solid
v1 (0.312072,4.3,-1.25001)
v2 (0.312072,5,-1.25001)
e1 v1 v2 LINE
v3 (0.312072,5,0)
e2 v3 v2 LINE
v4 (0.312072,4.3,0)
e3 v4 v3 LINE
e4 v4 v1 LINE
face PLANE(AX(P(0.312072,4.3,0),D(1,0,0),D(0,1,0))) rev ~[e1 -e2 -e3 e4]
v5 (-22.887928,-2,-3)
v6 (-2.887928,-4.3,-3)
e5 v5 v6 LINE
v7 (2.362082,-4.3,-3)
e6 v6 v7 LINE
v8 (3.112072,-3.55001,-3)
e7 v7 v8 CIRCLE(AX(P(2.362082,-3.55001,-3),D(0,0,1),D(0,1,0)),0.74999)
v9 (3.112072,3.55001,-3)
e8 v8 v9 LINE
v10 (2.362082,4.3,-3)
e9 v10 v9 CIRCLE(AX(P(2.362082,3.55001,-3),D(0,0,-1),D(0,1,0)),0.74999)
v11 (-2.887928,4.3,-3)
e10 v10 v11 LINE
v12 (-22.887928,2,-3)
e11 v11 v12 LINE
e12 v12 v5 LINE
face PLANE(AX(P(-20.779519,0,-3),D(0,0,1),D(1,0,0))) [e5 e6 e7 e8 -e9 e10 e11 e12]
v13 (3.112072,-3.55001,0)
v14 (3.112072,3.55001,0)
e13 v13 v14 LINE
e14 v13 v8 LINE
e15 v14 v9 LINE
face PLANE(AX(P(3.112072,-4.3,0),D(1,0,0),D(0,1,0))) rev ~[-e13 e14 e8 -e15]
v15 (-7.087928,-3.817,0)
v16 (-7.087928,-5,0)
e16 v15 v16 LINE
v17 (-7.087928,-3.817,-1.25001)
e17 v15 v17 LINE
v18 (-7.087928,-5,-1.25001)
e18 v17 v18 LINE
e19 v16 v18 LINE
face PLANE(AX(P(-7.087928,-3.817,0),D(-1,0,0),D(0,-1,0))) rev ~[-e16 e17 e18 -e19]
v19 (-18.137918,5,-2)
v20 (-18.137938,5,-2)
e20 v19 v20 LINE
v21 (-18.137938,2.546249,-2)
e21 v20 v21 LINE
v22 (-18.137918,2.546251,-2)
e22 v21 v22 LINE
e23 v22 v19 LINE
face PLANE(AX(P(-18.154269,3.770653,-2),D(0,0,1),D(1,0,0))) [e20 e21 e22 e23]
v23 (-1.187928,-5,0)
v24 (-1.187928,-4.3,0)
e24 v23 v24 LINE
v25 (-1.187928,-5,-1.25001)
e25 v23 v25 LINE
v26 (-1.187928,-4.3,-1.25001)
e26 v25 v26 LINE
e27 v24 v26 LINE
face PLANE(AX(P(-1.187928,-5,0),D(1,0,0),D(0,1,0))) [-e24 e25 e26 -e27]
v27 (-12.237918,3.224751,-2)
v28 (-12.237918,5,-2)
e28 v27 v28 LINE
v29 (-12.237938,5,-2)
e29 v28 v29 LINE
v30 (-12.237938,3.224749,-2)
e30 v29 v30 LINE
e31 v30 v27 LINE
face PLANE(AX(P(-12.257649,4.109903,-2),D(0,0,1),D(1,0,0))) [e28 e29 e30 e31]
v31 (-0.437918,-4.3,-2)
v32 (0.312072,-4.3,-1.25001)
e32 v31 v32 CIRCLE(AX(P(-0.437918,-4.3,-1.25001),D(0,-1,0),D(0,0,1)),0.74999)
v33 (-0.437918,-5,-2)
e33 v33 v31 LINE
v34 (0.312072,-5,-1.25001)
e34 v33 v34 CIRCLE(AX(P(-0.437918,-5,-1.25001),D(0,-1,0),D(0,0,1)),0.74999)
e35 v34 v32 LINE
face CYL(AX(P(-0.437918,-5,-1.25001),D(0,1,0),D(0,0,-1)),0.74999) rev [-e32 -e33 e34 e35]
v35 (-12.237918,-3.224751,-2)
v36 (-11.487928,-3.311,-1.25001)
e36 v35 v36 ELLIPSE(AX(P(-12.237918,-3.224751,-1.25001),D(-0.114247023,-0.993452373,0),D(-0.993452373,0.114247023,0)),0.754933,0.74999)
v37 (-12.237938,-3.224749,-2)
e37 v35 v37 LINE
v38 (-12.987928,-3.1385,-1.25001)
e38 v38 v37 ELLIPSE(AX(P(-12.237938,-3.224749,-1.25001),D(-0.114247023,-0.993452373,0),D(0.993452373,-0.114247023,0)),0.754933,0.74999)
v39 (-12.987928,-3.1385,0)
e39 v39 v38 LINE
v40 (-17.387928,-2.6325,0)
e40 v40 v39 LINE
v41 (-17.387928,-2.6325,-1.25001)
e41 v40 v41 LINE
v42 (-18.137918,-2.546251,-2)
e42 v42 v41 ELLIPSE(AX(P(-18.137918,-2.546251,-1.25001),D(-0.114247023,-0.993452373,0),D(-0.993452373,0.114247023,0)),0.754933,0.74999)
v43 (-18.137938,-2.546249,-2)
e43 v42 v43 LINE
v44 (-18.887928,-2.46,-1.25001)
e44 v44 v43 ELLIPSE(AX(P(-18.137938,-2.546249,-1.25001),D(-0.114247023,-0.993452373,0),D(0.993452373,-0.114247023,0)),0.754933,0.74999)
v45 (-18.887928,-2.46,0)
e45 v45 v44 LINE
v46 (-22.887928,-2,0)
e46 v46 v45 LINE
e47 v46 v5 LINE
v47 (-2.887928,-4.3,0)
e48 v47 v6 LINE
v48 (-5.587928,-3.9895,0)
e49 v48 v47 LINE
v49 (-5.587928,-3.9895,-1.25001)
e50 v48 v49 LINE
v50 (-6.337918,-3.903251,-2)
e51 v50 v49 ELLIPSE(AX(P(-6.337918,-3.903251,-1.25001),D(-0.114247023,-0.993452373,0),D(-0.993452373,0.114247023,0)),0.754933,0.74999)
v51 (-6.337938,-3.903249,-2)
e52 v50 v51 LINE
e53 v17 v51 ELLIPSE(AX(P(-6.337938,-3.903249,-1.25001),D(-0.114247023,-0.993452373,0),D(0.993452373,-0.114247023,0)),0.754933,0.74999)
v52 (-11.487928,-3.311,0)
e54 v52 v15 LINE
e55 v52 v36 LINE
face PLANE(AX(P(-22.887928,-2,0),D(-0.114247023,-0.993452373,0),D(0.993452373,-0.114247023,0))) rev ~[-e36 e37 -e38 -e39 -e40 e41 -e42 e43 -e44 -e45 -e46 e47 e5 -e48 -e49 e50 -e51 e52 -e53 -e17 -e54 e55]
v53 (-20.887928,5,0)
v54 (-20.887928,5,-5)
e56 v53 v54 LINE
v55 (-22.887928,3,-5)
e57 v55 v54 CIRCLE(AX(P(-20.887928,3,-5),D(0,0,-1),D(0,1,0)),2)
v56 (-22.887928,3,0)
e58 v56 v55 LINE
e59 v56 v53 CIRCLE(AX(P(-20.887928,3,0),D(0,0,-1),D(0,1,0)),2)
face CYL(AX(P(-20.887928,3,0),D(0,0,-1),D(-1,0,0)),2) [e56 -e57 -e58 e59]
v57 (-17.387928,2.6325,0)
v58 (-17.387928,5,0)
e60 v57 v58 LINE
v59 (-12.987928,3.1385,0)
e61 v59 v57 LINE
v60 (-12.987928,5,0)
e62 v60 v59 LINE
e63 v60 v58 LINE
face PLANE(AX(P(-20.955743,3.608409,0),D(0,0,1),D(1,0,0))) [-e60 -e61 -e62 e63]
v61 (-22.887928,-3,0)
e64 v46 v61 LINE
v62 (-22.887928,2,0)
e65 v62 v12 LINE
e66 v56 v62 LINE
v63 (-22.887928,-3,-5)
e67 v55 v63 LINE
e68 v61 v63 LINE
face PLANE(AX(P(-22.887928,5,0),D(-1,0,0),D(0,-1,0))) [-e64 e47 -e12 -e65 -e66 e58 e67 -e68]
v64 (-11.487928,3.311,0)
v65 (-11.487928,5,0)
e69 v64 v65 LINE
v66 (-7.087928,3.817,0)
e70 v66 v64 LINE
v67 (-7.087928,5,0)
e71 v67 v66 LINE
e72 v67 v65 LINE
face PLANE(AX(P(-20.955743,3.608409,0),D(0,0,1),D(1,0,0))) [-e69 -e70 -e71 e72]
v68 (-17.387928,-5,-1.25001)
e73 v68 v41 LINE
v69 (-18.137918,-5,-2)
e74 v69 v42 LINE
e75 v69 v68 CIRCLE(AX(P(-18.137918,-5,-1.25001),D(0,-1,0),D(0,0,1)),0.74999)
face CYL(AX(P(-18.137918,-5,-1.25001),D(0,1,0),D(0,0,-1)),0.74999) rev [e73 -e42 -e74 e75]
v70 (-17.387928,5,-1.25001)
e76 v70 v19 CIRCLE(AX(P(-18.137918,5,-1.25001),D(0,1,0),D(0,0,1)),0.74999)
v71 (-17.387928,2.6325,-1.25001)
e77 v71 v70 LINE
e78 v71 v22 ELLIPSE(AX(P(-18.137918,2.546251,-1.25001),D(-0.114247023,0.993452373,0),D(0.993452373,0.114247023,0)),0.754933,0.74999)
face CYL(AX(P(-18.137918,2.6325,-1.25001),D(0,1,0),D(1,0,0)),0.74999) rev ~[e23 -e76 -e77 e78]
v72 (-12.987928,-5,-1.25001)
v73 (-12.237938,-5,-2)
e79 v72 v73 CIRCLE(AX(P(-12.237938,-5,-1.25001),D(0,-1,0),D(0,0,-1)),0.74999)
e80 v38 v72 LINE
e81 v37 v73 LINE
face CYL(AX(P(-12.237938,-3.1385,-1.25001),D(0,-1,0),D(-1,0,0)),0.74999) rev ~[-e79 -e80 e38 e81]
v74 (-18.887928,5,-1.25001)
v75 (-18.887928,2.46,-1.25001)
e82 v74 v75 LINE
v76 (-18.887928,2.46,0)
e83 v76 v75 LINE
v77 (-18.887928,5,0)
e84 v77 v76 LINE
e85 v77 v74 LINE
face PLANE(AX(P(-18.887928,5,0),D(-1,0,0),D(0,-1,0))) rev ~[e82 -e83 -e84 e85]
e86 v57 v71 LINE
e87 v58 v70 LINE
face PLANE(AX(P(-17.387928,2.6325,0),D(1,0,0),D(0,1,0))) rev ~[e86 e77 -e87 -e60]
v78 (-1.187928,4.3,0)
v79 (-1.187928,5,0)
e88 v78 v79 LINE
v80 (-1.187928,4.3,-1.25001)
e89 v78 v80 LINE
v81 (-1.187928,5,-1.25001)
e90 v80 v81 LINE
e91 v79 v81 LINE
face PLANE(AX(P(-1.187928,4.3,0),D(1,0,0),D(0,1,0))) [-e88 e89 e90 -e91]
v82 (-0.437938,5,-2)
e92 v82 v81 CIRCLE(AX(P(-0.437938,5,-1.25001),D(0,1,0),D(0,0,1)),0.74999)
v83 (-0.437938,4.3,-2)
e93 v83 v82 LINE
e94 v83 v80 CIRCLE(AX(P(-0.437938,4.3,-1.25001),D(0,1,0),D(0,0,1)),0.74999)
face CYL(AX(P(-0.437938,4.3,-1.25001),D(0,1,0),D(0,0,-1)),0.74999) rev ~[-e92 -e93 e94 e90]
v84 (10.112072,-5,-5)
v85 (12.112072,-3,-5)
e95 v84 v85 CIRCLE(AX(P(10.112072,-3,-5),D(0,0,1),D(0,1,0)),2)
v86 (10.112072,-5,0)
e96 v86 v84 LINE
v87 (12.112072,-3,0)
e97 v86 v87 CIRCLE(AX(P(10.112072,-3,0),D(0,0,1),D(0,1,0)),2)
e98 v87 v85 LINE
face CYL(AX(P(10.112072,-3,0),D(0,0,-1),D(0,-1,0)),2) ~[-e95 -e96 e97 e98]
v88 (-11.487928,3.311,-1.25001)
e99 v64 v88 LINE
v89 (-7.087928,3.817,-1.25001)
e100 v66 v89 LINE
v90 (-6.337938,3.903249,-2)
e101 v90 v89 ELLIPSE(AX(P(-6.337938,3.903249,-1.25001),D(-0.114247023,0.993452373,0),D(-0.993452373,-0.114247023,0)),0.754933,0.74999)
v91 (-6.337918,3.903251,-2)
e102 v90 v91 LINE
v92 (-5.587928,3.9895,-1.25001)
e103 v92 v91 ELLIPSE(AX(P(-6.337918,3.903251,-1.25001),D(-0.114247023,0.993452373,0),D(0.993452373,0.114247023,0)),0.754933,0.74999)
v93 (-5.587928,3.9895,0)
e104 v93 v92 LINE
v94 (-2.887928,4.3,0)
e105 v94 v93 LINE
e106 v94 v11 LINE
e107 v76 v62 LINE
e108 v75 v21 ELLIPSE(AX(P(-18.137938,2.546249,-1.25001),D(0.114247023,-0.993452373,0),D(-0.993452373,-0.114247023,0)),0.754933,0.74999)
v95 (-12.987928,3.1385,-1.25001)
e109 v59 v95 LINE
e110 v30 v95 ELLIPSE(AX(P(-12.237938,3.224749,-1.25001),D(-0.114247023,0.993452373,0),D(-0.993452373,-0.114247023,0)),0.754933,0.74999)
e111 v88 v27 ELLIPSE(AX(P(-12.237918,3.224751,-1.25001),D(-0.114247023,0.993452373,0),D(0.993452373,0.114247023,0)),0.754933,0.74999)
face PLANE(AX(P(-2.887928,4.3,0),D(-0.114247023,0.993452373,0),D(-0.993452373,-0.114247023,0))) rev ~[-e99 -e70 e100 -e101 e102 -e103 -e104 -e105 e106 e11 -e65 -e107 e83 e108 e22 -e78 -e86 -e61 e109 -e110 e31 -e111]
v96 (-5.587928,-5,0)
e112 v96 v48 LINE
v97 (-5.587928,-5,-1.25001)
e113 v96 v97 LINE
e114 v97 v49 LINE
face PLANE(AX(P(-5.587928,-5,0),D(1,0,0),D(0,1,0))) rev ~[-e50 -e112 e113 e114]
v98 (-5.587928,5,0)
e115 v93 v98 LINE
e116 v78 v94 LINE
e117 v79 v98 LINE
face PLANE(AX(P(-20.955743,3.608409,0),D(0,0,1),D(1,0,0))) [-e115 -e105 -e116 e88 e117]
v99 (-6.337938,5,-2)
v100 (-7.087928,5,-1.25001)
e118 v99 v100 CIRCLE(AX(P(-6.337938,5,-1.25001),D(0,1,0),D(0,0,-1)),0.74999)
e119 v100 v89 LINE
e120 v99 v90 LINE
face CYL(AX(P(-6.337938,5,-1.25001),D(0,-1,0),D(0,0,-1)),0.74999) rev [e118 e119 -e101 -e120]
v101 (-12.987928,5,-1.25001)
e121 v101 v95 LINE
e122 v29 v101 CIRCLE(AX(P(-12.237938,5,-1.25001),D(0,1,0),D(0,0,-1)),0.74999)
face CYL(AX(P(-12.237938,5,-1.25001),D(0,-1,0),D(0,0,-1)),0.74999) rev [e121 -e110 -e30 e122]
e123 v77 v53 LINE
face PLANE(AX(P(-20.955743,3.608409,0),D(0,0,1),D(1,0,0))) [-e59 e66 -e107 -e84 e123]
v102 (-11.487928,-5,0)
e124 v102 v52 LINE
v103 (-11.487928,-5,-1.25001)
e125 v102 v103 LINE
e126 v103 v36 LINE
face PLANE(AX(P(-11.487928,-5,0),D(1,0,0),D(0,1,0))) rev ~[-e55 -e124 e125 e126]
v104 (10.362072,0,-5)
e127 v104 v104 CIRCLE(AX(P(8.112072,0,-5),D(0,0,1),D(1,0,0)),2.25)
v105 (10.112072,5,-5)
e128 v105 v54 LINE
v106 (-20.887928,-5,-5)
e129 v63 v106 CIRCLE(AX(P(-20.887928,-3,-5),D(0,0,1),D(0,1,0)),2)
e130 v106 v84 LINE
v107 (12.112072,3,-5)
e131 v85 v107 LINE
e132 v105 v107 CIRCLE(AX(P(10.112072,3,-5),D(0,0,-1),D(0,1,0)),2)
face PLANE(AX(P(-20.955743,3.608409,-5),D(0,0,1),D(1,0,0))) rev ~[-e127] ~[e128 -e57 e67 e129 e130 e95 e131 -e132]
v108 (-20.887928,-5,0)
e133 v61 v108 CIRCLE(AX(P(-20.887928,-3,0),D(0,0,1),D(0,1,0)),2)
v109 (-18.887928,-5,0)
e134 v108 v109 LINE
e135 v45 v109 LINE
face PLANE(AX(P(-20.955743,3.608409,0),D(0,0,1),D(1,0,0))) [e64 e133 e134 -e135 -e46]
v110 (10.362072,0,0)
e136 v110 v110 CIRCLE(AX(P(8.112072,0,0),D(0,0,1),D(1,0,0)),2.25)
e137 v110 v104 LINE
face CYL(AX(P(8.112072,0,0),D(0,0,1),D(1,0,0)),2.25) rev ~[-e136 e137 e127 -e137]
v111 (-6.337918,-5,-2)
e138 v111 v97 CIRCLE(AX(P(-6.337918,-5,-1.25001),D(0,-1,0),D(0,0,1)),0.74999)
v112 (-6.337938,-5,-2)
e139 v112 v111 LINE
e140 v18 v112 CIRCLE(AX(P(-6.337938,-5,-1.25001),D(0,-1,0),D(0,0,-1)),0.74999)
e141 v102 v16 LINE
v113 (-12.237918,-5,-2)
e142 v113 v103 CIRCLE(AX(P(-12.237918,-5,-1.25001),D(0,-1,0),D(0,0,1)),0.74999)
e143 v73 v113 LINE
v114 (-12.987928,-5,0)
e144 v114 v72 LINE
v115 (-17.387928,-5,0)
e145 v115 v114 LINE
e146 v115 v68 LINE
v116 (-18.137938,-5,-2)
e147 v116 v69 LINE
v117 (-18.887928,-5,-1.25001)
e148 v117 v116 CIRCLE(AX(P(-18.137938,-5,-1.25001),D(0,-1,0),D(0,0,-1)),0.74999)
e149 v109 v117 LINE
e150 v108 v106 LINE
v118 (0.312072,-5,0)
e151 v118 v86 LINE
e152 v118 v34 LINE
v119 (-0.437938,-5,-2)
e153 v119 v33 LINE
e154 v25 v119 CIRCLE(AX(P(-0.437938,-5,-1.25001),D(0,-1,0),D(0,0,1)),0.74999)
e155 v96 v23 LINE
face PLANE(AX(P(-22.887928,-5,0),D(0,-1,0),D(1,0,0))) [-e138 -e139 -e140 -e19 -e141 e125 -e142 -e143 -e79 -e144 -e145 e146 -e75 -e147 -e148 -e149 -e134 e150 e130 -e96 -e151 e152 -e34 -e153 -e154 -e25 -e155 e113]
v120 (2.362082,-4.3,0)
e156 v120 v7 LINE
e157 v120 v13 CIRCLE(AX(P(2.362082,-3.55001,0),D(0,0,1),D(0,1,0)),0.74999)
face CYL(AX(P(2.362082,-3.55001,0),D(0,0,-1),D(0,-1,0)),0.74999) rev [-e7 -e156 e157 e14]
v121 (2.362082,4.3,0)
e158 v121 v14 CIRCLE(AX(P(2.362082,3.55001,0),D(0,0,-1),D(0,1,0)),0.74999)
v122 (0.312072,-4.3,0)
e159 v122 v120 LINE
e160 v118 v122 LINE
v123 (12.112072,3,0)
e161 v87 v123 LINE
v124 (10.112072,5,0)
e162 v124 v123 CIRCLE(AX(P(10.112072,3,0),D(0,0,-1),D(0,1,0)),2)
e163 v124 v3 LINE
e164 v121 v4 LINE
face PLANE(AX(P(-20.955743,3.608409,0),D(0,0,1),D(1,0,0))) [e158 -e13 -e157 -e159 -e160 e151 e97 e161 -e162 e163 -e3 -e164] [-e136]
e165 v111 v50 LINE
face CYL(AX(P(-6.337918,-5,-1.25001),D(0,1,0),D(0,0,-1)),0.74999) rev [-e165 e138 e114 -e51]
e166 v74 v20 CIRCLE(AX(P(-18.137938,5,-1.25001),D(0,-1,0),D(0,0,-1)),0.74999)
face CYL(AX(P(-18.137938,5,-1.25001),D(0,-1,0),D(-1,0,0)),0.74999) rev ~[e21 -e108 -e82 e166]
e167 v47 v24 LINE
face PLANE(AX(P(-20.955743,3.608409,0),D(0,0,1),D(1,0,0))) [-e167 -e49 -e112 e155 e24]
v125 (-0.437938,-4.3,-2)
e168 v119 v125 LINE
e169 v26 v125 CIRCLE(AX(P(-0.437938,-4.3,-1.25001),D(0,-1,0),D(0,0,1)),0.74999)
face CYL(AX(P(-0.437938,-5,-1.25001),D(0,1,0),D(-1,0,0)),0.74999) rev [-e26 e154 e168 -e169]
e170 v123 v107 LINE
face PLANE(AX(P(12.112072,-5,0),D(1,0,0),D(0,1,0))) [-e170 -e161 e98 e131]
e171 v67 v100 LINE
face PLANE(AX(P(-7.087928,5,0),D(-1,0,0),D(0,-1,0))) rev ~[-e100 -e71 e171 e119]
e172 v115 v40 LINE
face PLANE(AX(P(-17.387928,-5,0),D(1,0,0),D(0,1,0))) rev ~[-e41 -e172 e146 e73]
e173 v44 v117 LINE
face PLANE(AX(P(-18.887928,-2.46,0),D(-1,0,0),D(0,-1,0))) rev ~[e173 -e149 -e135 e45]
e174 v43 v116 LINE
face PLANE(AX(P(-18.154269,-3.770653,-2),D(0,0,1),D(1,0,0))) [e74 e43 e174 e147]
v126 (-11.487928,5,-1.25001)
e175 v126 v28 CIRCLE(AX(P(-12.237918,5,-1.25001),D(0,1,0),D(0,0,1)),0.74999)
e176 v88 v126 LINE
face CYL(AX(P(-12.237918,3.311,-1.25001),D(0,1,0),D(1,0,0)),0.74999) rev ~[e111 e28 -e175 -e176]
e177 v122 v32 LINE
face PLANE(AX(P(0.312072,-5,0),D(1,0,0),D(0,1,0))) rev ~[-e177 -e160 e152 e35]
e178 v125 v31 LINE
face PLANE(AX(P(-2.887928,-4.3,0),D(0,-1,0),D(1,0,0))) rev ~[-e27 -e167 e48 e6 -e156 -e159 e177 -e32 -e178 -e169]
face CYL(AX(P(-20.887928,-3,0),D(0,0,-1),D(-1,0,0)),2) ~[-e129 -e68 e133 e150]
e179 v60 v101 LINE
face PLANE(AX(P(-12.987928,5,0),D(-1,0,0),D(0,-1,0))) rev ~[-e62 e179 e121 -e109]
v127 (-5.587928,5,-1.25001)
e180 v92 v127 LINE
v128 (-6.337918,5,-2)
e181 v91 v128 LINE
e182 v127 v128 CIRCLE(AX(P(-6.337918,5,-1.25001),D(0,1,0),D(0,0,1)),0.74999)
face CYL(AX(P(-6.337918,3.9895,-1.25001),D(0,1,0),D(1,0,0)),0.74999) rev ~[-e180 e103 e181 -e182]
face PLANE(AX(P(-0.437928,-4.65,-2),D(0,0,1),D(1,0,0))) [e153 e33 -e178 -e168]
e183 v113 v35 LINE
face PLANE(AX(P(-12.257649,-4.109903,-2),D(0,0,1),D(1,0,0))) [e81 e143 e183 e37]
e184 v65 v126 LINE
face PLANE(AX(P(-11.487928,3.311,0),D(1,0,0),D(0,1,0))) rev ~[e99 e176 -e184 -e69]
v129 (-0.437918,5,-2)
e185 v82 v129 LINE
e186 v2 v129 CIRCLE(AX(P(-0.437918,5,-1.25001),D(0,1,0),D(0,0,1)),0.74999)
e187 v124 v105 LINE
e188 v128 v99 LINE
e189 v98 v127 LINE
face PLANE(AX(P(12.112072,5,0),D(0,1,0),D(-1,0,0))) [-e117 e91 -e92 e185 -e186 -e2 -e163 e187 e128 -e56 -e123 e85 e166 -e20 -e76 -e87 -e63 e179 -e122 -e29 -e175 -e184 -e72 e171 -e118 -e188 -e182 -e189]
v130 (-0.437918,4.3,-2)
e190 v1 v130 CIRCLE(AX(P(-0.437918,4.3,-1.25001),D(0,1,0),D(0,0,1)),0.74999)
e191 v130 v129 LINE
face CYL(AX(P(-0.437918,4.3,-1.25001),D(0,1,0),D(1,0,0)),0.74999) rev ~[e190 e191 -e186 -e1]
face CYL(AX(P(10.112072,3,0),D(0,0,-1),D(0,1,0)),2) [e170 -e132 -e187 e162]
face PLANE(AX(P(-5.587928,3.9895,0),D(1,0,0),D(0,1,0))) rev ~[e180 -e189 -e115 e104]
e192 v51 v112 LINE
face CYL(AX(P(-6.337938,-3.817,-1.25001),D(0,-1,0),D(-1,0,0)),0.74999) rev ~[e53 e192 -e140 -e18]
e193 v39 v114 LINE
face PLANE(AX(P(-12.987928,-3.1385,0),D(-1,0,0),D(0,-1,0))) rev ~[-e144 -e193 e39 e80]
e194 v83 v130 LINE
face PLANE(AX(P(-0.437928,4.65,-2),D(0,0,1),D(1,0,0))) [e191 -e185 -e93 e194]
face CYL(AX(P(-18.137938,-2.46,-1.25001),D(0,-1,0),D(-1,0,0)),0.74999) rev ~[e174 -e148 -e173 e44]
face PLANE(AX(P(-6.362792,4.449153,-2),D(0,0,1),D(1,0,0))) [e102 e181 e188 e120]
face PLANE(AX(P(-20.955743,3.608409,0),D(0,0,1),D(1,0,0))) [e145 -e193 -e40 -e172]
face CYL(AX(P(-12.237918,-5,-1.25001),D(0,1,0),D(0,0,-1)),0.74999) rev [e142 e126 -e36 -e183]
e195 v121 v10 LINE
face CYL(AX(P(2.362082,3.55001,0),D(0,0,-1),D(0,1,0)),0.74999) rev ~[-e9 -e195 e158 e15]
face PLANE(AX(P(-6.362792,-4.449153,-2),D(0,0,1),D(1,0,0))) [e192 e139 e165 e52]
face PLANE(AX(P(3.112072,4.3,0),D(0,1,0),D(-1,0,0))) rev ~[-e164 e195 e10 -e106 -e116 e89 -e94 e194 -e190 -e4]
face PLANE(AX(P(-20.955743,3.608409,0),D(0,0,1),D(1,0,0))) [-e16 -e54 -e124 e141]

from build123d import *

# Parameters (mm, degrees)
F0_W     = 1.5
F0_H     = 0.7
F0_R     = 2.25
F0_H_2   = 8.6
F0_W_2   = 2.8
F1_DEPTH = 5
F2_DEPTH = 3
F3_DEPTH = 2
F4_R     = 0.74999
F5_R     = 2


# Not quite as in the source:
# - a fillet or chamfer is up to 0.001 mm smaller than in the source, because OpenCascade refuses the exact size


with BuildPart() as f1:
    # F0 (on Top) → F1 (new body)
    with BuildSketch(Plane.XY):
        Polygon((-18.8879279066, 5), (-22.8879279066, 5), (-22.8879279066, 2), (-18.8879279066, 2.46), align=None)
        Polygon((-17.3879279066, 5), (-18.8879279066, 5), (-18.8879279066, 2.46), (-17.3879279066, 2.6325), align=None)
        Polygon((-18.8879279066, 2.46), (-22.8879279066, 2), (-22.8879279066, -2), (-18.8879279066, -2.46), align=None)
        Polygon((-12.9879279066, 5), (-17.3879279066, 5), (-17.3879279066, 2.6325), (-12.9879279066, 3.1385), align=None)
        Polygon((-18.8879279066, -2.46), (-22.8879279066, -2), (-22.8879279066, -5), (-18.8879279066, -5), align=None)
        Polygon((-11.4879279066, 5), (-12.9879279066, 5), (-12.9879279066, 3.1385), (-11.4879279066, 3.311), align=None)
        Polygon((-17.3879279066, -2.6325), (-18.8879279066, -2.46), (-18.8879279066, -5), (-17.3879279066, -5), align=None)
        Polygon((-7.0879279066, 5), (-11.4879279066, 5), (-11.4879279066, 3.311), (-7.0879279066, 3.817), align=None)
        Polygon((-12.9879279066, -3.1385), (-17.3879279066, -2.6325), (-17.3879279066, -5), (-12.9879279066, -5), align=None)
        Polygon((-5.5879279066, 5), (-7.0879279066, 5), (-7.0879279066, 3.817), (-5.5879279066, 3.9895), align=None)
        Polygon((-11.4879279066, -3.311), (-12.9879279066, -3.1385), (-12.9879279066, -5), (-11.4879279066, -5), align=None)
        Polygon((-1.1879279066, 5), (-5.5879279066, 5), (-5.5879279066, 3.9895), (-2.8879279066, 4.3), (-1.1879279066, 4.3), align=None)
        Polygon((-7.0879279066, -3.817), (-11.4879279066, -3.311), (-11.4879279066, -5), (-7.0879279066, -5), align=None)
        with Locations((-0.4379279066, 4.65)):
            Rectangle(F0_W, F0_H)
        Polygon((-5.5879279066, -3.9895), (-7.0879279066, -3.817), (-7.0879279066, -5), (-5.5879279066, -5), align=None)
        Polygon((12.1120720934, 5), (0.3120720934, 5), (0.3120720934, 4.3), (3.1120720934, 4.3), (3.1120720934, -4.3), (0.3120720934, -4.3), (0.3120720934, -5), (12.1120720934, -5), align=None)
        with Locations((8.1120720934, 0)):
            Circle(F0_R, mode=Mode.SUBTRACT)
        Polygon((-2.8879279066, -4.3), (-5.5879279066, -3.9895), (-5.5879279066, -5), (-1.1879279066, -5), (-1.1879279066, -4.3), align=None)
        with Locations((-0.4379279066, -4.65)):
            Rectangle(F0_W, F0_H)
        with Locations((-0.4379279066, 0)):
            Rectangle(F0_W, F0_H_2)
        Polygon((-5.5879279066, 3.9895), (-7.0879279066, 3.817), (-7.0879279066, -3.817), (-5.5879279066, -3.9895), align=None)
        Polygon((-17.3879279066, 2.6325), (-18.8879279066, 2.46), (-18.8879279066, -2.46), (-17.3879279066, -2.6325), align=None)
        Polygon((-12.9879279066, 3.1385), (-17.3879279066, 2.6325), (-17.3879279066, -2.6325), (-12.9879279066, -3.1385), align=None)
        Polygon((-7.0879279066, 3.817), (-11.4879279066, 3.311), (-11.4879279066, -3.311), (-7.0879279066, -3.817), align=None)
        Polygon((-11.4879279066, 3.311), (-12.9879279066, 3.1385), (-12.9879279066, -3.1385), (-11.4879279066, -3.311), align=None)
        Polygon((-2.8879279066, 4.3), (-5.5879279066, 3.9895), (-5.5879279066, -3.9895), (-2.8879279066, -4.3), (-1.1879279066, -4.3), (-1.1879279066, 4.3), align=None)
        with Locations((1.7120720934, 0)):
            Rectangle(F0_W_2, F0_H_2)
    extrude(amount=-F1_DEPTH)

    # F0 (on Top) → F2 (cut)
    with BuildSketch(Plane.XY):
        Polygon((-18.8879279066, 2.46), (-22.8879279066, 2), (-22.8879279066, -2), (-18.8879279066, -2.46), align=None)
        Polygon((-17.3879279066, 2.6325), (-18.8879279066, 2.46), (-18.8879279066, -2.46), (-17.3879279066, -2.6325), align=None)
        Polygon((-12.9879279066, 3.1385), (-17.3879279066, 2.6325), (-17.3879279066, -2.6325), (-12.9879279066, -3.1385), align=None)
        Polygon((-11.4879279066, 3.311), (-12.9879279066, 3.1385), (-12.9879279066, -3.1385), (-11.4879279066, -3.311), align=None)
        Polygon((-7.0879279066, 3.817), (-11.4879279066, 3.311), (-11.4879279066, -3.311), (-7.0879279066, -3.817), align=None)
        Polygon((-5.5879279066, 3.9895), (-7.0879279066, 3.817), (-7.0879279066, -3.817), (-5.5879279066, -3.9895), align=None)
        Polygon((-2.8879279066, 4.3), (-5.5879279066, 3.9895), (-5.5879279066, -3.9895), (-2.8879279066, -4.3), (-1.1879279066, -4.3), (-1.1879279066, 4.3), align=None)
        with Locations((-0.4379279066, 0)):
            Rectangle(F0_W, F0_H_2)
        with Locations((1.7120720934, 0)):
            Rectangle(F0_W_2, F0_H_2)
    extrude(amount=-F2_DEPTH, mode=Mode.SUBTRACT)

    # F0 (on Top) → F3 (cut)
    with BuildSketch(Plane.XY):
        Polygon((-17.3879279066, 5), (-18.8879279066, 5), (-18.8879279066, 2.46), (-17.3879279066, 2.6325), align=None)
        Polygon((-11.4879279066, 5), (-12.9879279066, 5), (-12.9879279066, 3.1385), (-11.4879279066, 3.311), align=None)
        Polygon((-5.5879279066, 5), (-7.0879279066, 5), (-7.0879279066, 3.817), (-5.5879279066, 3.9895), align=None)
        with Locations((-0.4379279066, -4.65)):
            Rectangle(F0_W, F0_H)
        Polygon((-17.3879279066, -2.6325), (-18.8879279066, -2.46), (-18.8879279066, -5), (-17.3879279066, -5), align=None)
        Polygon((-11.4879279066, -3.311), (-12.9879279066, -3.1385), (-12.9879279066, -5), (-11.4879279066, -5), align=None)
        Polygon((-5.5879279066, -3.9895), (-7.0879279066, -3.817), (-7.0879279066, -5), (-5.5879279066, -5), align=None)
        with Locations((-0.4379279066, 4.65)):
            Rectangle(F0_W, F0_H)
    extrude(amount=-F3_DEPTH, mode=Mode.SUBTRACT)

    # F4 (radius 0.75 in the source; OpenCascade refuses exactly that, so slightly less here)
    f4_edges = [f1.edges().sort_by_distance(p)[0] for p in [
        (-17.387928, -3.81625, -2),
        (-11.487928, -4.1555, -2),
        (-5.587928, -4.49475, -2),
        (0.312072, -4.65, -2),
        (-18.887928, -3.73, -2),
        (-12.987928, -4.06925, -2),
        (-7.087928, -4.4085, -2),
        (-1.187928, -4.65, -2),
        (-18.887928, 3.73, -2),
        (-12.987928, 4.06925, -2),
        (-7.087928, 4.4085, -2),
        (-1.187928, 4.65, -2),
        (-17.387928, 3.81625, -2),
        (-11.487928, 4.1555, -2),
        (-5.587928, 4.49475, -2),
        (0.312072, 4.65, -2),
        (3.112072, 4.3, -1.5),
        (3.112072, -4.3, -1.5),
    ]]
    fillet(f4_edges, radius=F4_R)

    # F5
    f5_edges = [f1.edges().sort_by_distance(p)[0] for p in [
        (-22.887928, -5, -2.5),
        (-22.887928, 5, -2.5),
        (12.112072, -5, -2.5),
        (12.112072, 5, -2.5),
    ]]
    fillet(f5_edges, radius=F5_R)


solid = f1.part
